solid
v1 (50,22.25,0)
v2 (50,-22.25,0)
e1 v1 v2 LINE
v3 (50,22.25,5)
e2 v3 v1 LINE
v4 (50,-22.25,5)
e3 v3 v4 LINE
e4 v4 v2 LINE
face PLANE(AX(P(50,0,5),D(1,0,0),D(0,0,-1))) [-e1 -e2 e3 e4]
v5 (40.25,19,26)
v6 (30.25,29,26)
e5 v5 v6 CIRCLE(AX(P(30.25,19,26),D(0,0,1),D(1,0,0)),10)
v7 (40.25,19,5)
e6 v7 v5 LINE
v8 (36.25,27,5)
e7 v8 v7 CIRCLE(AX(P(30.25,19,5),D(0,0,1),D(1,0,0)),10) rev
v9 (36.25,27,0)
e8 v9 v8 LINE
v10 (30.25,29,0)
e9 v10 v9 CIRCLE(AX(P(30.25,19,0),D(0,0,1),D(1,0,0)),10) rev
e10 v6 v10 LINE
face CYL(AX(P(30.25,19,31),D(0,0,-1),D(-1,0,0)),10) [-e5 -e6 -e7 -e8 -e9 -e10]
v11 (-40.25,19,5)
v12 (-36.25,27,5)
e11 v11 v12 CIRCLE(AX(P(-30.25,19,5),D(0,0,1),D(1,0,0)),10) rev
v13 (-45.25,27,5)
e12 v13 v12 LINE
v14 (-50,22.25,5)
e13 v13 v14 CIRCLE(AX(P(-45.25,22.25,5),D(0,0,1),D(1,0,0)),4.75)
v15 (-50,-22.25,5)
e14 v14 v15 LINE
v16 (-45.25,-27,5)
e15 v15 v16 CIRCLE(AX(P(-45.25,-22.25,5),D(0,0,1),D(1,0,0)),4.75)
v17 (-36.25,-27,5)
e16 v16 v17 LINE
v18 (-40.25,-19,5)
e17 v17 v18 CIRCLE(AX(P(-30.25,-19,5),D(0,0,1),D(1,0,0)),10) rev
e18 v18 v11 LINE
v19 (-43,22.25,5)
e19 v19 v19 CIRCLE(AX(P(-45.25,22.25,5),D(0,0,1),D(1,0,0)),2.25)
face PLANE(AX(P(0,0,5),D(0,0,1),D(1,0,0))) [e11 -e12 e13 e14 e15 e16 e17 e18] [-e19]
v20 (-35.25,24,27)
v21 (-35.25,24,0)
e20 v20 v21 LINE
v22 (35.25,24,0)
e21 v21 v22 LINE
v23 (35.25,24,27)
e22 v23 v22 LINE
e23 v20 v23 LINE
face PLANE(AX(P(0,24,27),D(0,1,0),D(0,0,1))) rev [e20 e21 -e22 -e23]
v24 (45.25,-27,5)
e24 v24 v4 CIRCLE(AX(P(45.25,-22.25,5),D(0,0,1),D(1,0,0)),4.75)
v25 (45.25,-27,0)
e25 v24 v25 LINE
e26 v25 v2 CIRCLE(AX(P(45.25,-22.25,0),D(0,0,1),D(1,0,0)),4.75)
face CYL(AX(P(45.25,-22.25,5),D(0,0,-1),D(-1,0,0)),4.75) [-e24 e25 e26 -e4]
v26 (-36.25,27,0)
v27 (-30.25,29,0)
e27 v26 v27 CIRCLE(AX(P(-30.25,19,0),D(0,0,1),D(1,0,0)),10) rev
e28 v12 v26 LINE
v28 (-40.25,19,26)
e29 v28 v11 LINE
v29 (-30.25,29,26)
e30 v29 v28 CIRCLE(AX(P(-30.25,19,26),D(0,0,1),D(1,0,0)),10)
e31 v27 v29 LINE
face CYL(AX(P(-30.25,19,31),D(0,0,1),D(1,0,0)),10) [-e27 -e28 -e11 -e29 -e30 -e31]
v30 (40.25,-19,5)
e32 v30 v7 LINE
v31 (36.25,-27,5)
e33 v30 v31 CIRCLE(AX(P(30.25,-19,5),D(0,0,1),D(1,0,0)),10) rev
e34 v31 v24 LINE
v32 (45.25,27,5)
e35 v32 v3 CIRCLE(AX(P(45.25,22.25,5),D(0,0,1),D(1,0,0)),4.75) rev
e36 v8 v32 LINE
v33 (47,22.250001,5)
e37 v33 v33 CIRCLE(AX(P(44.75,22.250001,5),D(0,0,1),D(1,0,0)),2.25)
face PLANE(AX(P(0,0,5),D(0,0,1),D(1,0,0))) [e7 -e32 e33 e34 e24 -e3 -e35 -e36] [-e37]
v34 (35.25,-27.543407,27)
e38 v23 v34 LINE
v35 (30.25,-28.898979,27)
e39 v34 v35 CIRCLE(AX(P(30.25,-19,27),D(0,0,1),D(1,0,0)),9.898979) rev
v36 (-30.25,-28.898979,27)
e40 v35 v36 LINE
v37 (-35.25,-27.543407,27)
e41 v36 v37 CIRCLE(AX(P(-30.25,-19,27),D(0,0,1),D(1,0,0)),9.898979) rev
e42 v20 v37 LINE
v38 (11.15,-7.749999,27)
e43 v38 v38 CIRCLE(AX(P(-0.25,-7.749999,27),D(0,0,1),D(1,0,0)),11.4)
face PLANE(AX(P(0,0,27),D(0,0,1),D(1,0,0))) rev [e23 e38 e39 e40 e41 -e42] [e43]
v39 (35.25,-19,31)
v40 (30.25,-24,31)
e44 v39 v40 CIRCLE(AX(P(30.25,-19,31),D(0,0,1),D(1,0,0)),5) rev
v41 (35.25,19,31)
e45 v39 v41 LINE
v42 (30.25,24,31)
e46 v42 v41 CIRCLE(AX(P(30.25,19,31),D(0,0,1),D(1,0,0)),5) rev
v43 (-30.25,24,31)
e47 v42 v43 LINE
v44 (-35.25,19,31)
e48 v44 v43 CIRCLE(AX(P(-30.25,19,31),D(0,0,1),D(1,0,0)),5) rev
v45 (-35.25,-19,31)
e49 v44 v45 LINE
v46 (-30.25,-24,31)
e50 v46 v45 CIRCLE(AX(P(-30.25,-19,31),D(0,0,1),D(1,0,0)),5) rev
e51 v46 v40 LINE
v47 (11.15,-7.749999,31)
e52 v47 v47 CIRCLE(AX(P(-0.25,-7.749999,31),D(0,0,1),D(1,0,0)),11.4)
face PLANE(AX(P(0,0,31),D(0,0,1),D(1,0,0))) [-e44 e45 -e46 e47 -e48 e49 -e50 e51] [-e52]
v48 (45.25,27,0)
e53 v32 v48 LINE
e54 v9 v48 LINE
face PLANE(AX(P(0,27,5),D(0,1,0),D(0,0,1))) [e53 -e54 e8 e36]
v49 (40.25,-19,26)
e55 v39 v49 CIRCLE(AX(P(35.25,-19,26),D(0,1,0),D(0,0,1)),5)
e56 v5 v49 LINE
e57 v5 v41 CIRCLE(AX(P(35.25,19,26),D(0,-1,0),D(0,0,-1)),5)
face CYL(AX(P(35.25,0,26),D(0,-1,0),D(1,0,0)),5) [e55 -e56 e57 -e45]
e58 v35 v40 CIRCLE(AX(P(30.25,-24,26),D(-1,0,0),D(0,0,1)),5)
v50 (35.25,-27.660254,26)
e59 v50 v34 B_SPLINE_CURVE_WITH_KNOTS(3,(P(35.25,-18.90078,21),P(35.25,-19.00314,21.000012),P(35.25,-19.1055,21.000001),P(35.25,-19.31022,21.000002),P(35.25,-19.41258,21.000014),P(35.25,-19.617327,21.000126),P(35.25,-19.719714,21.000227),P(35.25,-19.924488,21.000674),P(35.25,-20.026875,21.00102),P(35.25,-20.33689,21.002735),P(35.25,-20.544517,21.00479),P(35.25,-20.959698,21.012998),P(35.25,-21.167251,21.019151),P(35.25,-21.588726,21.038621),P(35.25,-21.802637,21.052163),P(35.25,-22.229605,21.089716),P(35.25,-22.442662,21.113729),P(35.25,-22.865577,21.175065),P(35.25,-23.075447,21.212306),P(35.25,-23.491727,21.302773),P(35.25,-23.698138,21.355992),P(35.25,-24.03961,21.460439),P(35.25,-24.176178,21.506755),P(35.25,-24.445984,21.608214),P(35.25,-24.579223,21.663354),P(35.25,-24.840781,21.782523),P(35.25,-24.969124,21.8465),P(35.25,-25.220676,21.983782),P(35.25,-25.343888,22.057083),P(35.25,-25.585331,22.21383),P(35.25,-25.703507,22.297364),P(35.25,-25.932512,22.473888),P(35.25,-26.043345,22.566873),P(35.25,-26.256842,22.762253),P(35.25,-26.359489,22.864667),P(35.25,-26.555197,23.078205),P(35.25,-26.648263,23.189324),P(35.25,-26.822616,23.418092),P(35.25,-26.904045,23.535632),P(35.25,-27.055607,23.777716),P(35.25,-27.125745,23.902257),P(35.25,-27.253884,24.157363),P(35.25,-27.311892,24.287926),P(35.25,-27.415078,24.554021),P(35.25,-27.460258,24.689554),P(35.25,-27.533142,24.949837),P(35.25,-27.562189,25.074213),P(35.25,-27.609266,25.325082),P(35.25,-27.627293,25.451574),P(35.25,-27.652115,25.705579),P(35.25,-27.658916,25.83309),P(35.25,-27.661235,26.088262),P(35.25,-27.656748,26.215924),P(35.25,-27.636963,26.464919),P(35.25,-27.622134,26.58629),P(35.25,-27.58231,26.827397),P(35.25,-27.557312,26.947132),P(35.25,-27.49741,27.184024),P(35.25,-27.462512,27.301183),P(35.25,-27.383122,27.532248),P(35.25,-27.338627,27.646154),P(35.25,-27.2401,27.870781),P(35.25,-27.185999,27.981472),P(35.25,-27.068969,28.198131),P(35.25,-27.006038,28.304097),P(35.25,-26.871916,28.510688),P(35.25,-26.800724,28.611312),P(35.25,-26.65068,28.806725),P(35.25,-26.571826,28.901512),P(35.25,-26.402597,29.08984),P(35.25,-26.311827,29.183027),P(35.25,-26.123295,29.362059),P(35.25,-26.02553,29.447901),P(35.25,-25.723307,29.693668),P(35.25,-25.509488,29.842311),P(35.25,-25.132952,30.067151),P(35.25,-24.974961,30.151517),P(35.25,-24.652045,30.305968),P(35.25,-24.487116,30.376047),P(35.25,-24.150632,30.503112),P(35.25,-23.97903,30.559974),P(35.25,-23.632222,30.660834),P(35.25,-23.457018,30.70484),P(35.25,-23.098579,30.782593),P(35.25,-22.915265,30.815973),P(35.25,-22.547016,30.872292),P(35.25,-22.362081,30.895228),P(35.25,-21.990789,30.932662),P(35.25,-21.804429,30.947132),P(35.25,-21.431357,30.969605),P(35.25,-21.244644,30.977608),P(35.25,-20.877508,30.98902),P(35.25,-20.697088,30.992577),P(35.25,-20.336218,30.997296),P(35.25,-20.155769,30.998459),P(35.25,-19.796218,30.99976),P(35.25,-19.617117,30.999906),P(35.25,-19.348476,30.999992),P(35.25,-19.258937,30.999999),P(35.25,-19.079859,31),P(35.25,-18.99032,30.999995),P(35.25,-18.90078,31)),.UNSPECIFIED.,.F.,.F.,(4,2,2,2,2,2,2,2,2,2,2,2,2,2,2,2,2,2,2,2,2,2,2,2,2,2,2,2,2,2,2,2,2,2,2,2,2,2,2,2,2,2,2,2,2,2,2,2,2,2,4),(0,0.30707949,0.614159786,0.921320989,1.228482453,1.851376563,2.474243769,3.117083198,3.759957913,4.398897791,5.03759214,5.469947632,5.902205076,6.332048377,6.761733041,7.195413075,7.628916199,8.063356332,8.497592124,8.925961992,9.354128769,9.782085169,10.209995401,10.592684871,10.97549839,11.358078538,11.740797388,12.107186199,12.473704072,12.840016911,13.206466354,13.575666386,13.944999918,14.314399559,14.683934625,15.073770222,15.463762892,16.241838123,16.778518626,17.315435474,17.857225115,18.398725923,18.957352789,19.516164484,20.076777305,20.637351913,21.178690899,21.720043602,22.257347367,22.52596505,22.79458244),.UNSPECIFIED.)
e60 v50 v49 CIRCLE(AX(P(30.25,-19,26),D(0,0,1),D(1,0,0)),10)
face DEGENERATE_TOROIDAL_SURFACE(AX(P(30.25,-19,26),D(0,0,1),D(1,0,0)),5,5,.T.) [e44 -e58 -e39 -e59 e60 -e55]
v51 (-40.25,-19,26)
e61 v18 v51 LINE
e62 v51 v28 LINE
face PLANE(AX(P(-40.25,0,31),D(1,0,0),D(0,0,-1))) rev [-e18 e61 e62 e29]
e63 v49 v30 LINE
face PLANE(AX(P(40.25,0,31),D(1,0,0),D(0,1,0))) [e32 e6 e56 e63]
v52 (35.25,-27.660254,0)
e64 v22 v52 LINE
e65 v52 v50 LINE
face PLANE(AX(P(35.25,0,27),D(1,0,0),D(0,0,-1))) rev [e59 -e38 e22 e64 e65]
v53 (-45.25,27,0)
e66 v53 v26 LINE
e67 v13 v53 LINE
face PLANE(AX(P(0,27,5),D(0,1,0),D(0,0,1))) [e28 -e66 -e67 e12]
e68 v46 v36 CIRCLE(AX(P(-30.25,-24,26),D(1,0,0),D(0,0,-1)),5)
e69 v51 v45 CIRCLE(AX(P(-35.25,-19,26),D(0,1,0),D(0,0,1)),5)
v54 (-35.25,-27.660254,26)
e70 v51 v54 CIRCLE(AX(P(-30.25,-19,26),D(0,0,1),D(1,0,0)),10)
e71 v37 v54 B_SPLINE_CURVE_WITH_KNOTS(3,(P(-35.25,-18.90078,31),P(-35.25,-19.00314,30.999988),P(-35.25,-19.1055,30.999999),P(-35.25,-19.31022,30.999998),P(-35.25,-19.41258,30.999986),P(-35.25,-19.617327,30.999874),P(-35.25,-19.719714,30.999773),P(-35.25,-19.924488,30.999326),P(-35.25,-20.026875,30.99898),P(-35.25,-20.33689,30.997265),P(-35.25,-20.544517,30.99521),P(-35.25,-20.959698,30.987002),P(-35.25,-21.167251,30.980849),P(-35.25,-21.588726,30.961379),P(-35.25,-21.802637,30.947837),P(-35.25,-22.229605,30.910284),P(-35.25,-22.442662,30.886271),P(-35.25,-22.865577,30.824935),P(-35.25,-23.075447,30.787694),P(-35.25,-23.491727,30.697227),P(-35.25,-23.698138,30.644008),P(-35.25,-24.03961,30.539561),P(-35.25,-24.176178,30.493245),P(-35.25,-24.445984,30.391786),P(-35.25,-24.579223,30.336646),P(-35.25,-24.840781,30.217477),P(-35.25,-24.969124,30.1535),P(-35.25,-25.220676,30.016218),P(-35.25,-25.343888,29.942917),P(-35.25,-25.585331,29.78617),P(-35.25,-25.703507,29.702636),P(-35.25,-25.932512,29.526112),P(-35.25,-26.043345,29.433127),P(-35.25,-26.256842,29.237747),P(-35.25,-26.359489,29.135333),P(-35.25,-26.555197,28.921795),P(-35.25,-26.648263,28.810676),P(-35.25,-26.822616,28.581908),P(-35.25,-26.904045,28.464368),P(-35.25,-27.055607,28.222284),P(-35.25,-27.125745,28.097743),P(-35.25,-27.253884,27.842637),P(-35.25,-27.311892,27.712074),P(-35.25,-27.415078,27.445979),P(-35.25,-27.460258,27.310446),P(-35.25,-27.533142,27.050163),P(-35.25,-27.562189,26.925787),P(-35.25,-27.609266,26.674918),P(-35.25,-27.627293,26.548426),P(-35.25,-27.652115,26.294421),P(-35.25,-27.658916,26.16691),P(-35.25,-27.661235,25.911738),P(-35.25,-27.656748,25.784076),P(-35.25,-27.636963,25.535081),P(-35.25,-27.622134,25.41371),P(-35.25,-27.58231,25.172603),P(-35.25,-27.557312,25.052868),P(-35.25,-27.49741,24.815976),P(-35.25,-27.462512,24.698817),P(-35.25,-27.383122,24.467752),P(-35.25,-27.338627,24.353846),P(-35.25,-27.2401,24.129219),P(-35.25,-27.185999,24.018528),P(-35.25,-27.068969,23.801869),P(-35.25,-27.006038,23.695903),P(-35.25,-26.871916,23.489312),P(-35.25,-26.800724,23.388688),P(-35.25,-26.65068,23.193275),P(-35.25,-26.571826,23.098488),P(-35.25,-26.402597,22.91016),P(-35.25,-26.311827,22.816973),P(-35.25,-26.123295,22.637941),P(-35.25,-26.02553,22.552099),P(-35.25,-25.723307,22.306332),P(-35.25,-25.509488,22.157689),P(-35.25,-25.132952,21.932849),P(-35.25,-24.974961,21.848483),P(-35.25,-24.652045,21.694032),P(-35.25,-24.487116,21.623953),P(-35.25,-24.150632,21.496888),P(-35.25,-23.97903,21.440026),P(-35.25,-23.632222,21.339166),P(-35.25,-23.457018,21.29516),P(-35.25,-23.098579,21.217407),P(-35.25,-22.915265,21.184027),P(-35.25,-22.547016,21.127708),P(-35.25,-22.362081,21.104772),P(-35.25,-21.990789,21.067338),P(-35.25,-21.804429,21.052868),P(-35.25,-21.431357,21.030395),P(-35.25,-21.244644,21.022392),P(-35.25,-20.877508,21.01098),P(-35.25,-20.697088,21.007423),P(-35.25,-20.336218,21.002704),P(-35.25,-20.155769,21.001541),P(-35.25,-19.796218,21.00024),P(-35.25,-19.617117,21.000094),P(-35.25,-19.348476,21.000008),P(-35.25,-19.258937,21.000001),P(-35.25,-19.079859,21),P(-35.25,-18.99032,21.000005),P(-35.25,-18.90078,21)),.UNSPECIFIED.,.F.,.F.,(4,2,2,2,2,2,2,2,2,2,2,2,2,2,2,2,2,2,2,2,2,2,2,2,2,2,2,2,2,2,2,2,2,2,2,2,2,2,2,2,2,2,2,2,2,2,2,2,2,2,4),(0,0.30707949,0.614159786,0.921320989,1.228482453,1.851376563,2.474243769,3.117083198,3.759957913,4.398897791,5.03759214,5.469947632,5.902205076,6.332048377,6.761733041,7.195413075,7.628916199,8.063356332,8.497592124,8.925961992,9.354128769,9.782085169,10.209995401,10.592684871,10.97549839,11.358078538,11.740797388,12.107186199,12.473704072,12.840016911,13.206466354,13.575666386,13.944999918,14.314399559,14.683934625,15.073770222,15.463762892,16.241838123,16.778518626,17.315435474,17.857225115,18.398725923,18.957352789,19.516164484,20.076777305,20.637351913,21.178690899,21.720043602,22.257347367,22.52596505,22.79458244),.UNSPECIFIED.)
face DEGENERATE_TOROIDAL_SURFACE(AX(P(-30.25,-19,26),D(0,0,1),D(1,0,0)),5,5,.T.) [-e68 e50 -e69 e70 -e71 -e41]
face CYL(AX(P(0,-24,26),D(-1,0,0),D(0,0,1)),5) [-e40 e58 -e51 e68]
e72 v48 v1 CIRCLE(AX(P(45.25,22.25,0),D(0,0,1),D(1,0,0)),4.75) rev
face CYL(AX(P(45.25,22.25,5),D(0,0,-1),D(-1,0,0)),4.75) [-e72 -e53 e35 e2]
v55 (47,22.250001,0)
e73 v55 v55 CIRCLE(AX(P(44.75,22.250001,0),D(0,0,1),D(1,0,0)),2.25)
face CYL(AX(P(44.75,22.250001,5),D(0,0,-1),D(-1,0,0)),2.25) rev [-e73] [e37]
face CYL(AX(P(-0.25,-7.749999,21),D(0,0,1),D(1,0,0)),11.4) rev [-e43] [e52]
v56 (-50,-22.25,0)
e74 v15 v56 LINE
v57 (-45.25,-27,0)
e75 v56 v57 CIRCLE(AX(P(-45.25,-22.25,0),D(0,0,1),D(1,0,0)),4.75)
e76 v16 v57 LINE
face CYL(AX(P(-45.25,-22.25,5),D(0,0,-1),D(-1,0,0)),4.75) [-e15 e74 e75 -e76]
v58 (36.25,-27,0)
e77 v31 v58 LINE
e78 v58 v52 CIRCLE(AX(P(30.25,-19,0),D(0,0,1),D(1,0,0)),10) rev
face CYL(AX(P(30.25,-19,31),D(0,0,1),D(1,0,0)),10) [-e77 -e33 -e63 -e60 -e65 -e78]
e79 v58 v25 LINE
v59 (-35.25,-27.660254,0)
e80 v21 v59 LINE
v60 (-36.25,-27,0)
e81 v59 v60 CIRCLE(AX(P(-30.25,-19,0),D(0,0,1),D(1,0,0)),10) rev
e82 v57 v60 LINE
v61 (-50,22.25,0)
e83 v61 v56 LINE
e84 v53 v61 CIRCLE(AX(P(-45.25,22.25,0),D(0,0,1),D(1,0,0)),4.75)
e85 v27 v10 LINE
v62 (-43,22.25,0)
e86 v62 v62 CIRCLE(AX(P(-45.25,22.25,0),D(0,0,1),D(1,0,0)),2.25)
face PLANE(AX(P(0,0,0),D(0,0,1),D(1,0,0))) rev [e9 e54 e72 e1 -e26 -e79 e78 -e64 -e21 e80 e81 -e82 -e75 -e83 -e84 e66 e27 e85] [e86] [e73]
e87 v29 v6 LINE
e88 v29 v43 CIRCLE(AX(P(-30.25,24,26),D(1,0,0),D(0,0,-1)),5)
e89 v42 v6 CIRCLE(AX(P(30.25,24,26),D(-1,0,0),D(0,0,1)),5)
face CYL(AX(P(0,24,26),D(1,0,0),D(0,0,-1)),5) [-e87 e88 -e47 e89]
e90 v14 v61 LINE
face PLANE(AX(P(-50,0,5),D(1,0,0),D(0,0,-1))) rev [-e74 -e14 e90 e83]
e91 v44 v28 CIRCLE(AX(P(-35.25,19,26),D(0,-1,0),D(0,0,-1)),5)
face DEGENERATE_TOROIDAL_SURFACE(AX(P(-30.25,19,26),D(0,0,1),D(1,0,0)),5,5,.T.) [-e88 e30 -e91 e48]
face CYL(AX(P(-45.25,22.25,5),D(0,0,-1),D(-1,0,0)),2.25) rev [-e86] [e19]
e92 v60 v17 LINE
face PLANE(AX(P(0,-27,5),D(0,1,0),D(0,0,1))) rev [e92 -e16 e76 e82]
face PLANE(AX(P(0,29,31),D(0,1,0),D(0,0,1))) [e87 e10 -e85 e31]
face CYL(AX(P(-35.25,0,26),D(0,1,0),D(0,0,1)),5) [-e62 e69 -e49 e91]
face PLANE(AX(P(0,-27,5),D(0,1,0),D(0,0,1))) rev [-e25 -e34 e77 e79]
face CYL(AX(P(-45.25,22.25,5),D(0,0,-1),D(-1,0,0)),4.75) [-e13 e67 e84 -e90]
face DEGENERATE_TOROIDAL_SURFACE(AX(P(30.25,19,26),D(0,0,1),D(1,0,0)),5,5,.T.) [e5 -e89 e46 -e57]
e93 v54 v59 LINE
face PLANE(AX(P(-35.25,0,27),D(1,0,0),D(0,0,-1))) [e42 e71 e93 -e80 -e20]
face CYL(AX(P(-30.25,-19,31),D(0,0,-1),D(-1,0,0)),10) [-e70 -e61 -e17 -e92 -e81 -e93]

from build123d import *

# Parameters (mm, degrees)
CROQUIS1_R              = 2.25
CROQUIS1_W              = 70.5
CROQUIS1_H              = 48
SALIENTE_EXTRUIR1_DEPTH = 5
CROQUIS1_3_W            = 80.5
CROQUIS1_3_H            = 2
CROQUIS1_3_H_2          = 54
CROQUIS1_3_W_2          = 70.5
CROQUIS1_3_H_3          = 48
SALIENTE_EXTRUIR2_DEPTH = 31
CROQUIS1_5_W            = 70.5
CROQUIS1_5_H            = 48
CORTAR_EXTRUIR2_DEPTH   = 27
REDONDEO4_R             = 5
REDONDEO5_START         = 5
REDONDEO5_DEPTH         = 26
REDONDEO5_START_2       = -1
REDONDEO5_2_DEPTH       = 8.65388
REDONDEO5_3_ANGLE       = 90
REDONDEO5_4_ANGLE       = 90
REDONDEO5_5_ANGLE       = 90
REDONDEO5_6_ANGLE       = 90
CROQUIS3_W              = 70.5
CROQUIS3_H              = 27
CORTAR_EXTRUIR5_DEPTH   = 80.183331618
CROQUIS4_R              = 11.399999943
CORTAR_EXTRUIR6_DEPTH   = 10


with BuildPart() as part:
    # Croquis1 → Saliente-Extruir1 (new body)
    with BuildSketch(Plane.XY):
        with BuildLine():
            Line((-45.25, 27), (45.25, 27))
            ThreePointArc((45.25, 27), (48.608757211, 25.608757211), (50, 22.25))
            Line((50, 22.25), (50, -22.25))
            ThreePointArc((50, -22.25), (48.608757211, -25.608757211), (45.25, -27))
            Line((45.25, -27), (-45.25, -27))
            ThreePointArc((-45.25, -27), (-48.608757211, -25.608757211), (-50, -22.25))
            Line((-50, -22.25), (-50, 22.25))
            ThreePointArc((-50, 22.25), (-48.608757211, 25.608757211), (-45.25, 27))
        make_face()
        with Locations((-45.25, 22.25)):
            Circle(CROQUIS1_R, mode=Mode.SUBTRACT)
        with Locations((44.75000048, 22.250001182)):
            Circle(CROQUIS1_R, mode=Mode.SUBTRACT)
        Rectangle(CROQUIS1_W, CROQUIS1_H, mode=Mode.SUBTRACT)
    extrude(amount=SALIENTE_EXTRUIR1_DEPTH)

    # Croquis1<3> → Saliente-Extruir2 (add)
    # profile 1 of 4: a face of its own
    with BuildSketch(Plane.XY):
        with Locations((0, 28)):
            Rectangle(CROQUIS1_3_W, CROQUIS1_3_H)
    # profile 2 of 4: a face of its own
    with BuildSketch(Plane.XY):
        Rectangle(CROQUIS1_3_W, CROQUIS1_3_H_2)
        Rectangle(CROQUIS1_3_W_2, CROQUIS1_3_H_3, mode=Mode.SUBTRACT)
    # profile 3 of 4: a face of its own
    with BuildSketch(Plane.XY):
        Rectangle(CROQUIS1_3_W_2, CROQUIS1_3_H_3)
    # profile 4 of 4: a face of its own
    with BuildSketch(Plane.XY):
        with Locations((0, -28)):
            Rectangle(CROQUIS1_3_W, CROQUIS1_3_H)
    extrude(amount=SALIENTE_EXTRUIR2_DEPTH)

    # Croquis1<5> → Cortar-Extruir2 (cut)
    with BuildSketch(Plane.XY):
        Rectangle(CROQUIS1_5_W, CROQUIS1_5_H)
    extrude(amount=CORTAR_EXTRUIR2_DEPTH, mode=Mode.SUBTRACT)

    # Redondeo4
    redondeo4_edges = [part.edges().sort_by_distance(p)[0] for p in [
        (40.25, 0, 31),
        (0, 29, 31),
        (-40.25, 0, 31),
        (0, -29, 31),
    ]]
    fillet(redondeo4_edges, radius=REDONDEO4_R)

    # Redondeo5: read off the stored shape, not the designer's step
    # Redondeo5 outline → Redondeo5 (cut)
    with BuildSketch(Plane.XY.offset(REDONDEO5_START)):
        with BuildLine():
            ThreePointArc((-40.25, 19), (-37.321067812, 26.071067812), (-30.25, 29))
            Line((-30.25, 29), (-40.25, 29))
            Line((-40.25, 29), (-40.25, 19))
        make_face()
        with BuildLine():
            Line((40.25, 29), (30.25, 29))
            ThreePointArc((30.25, 29), (37.321067812, 26.071067812), (40.25, 19))
            Line((40.25, 19), (40.25, 29))
        make_face()
        with BuildLine():
            Line((-40.25, -19), (-40.25, -29))
            Line((-40.25, -29), (-30.25, -29))
            ThreePointArc((-30.25, -29), (-37.321067812, -26.071067812), (-40.25, -19))
        make_face()
        with BuildLine():
            ThreePointArc((40.25, -19), (37.321067812, -26.071067812), (30.25, -29))
            Line((30.25, -29), (40.25, -29))
            Line((40.25, -29), (40.25, -19))
        make_face()
    extrude(amount=REDONDEO5_DEPTH, mode=Mode.SUBTRACT)

    # Redondeo5 2 outline → Redondeo5 2 (cut)
    with BuildSketch(Plane.XY.offset(REDONDEO5_START_2)):
        with BuildLine():
            Line((-40.25, 27), (-36.25, 27))
            ThreePointArc((-36.25, 27), (-33.41227766, 28.486832981), (-30.25, 29))
            Line((-30.25, 29), (-40.25, 29))
            Line((-40.25, 29), (-40.25, 27))
        make_face()
        with BuildLine():
            Line((40.25, 29), (30.25, 29))
            ThreePointArc((30.25, 29), (33.41227766, 28.486832981), (36.25, 27))
            Line((36.25, 27), (40.25, 27))
            Line((40.25, 27), (40.25, 29))
        make_face()
        with BuildLine():
            ThreePointArc((-30.25, -29), (-33.41227766, -28.486832981), (-36.25, -27))
            Line((-36.25, -27), (-40.25, -27))
            Line((-40.25, -27), (-40.25, -29))
            Line((-40.25, -29), (-30.25, -29))
        make_face()
        with BuildLine():
            ThreePointArc((36.25, -27), (33.41227766, -28.486832981), (30.25, -29))
            Line((30.25, -29), (40.25, -29))
            Line((40.25, -29), (40.25, -27))
            Line((40.25, -27), (36.25, -27))
        make_face()
    extrude(amount=REDONDEO5_2_DEPTH, mode=Mode.SUBTRACT)

    # Redondeo5 3 outline → Redondeo5 3 (revolve, cut)
    with BuildSketch(Plane(origin=(30.25, 19, 0), x_dir=(1, 0, 0), z_dir=(0, -1, 0))):
        with BuildLine():
            ThreePointArc((5, 31), (8.535533906, 29.535533906), (10, 26))
            Line((10, 26), (10, 31))
            Line((10, 31), (5, 31))
        make_face()
    revolve(axis=Axis((30.25, 19, 0), (0, 0, 1)), revolution_arc=REDONDEO5_3_ANGLE, mode=Mode.SUBTRACT)

    # Redondeo5 4 outline → Redondeo5 4 (revolve, cut)
    with BuildSketch(Plane(origin=(-30.25, 19, 0), x_dir=(0, 1, 0), z_dir=(1, 0, 0))):
        with BuildLine():
            ThreePointArc((5, 31), (8.535533906, 29.535533906), (10, 26))
            Line((10, 26), (10, 31))
            Line((10, 31), (5, 31))
        make_face()
    revolve(axis=Axis((-30.25, 19, 0), (0, 0, 1)), revolution_arc=REDONDEO5_4_ANGLE, mode=Mode.SUBTRACT)

    # Redondeo5 5 outline → Redondeo5 5 (revolve, cut)
    with BuildSketch(Plane(origin=(-30.25, -19, 0), x_dir=(-1, 0, 0), z_dir=(0, 1, 0))):
        with BuildLine():
            ThreePointArc((5, 31), (8.535533906, 29.535533906), (10, 26))
            Line((10, 26), (10, 31))
            Line((10, 31), (5, 31))
        make_face()
    revolve(axis=Axis((-30.25, -19, 0), (0, 0, 1)), revolution_arc=REDONDEO5_5_ANGLE, mode=Mode.SUBTRACT)

    # Redondeo5 6 outline → Redondeo5 6 (revolve, cut)
    with BuildSketch(Plane(origin=(30.25, -19, 0), x_dir=(0, -1, 0), z_dir=(-1, 0, 0))):
        with BuildLine():
            ThreePointArc((5, 31), (8.535533906, 29.535533906), (10, 26))
            Line((10, 26), (10, 31))
            Line((10, 31), (5, 31))
        make_face()
    revolve(axis=Axis((30.25, -19, 0), (0, 0, 1)), revolution_arc=REDONDEO5_6_ANGLE, mode=Mode.SUBTRACT)

    # Croquis3 → Cortar-Extruir5 (cut, through all)
    with BuildSketch(Plane(origin=(0, -24, 0), x_dir=(1, 0, 0), z_dir=(0, 1, 0))):
        with Locations((0, -13.5)):
            Rectangle(CROQUIS3_W, CROQUIS3_H)
    extrude(amount=-CORTAR_EXTRUIR5_DEPTH, mode=Mode.SUBTRACT)

    # Croquis4 → Cortar-Extruir6 (cut)
    with BuildSketch(Plane.XY.offset(31)):
        with Locations((-0.24999952, -7.749998818)):
            Circle(CROQUIS4_R)
    extrude(amount=-CORTAR_EXTRUIR6_DEPTH, mode=Mode.SUBTRACT)


solid = part.part
